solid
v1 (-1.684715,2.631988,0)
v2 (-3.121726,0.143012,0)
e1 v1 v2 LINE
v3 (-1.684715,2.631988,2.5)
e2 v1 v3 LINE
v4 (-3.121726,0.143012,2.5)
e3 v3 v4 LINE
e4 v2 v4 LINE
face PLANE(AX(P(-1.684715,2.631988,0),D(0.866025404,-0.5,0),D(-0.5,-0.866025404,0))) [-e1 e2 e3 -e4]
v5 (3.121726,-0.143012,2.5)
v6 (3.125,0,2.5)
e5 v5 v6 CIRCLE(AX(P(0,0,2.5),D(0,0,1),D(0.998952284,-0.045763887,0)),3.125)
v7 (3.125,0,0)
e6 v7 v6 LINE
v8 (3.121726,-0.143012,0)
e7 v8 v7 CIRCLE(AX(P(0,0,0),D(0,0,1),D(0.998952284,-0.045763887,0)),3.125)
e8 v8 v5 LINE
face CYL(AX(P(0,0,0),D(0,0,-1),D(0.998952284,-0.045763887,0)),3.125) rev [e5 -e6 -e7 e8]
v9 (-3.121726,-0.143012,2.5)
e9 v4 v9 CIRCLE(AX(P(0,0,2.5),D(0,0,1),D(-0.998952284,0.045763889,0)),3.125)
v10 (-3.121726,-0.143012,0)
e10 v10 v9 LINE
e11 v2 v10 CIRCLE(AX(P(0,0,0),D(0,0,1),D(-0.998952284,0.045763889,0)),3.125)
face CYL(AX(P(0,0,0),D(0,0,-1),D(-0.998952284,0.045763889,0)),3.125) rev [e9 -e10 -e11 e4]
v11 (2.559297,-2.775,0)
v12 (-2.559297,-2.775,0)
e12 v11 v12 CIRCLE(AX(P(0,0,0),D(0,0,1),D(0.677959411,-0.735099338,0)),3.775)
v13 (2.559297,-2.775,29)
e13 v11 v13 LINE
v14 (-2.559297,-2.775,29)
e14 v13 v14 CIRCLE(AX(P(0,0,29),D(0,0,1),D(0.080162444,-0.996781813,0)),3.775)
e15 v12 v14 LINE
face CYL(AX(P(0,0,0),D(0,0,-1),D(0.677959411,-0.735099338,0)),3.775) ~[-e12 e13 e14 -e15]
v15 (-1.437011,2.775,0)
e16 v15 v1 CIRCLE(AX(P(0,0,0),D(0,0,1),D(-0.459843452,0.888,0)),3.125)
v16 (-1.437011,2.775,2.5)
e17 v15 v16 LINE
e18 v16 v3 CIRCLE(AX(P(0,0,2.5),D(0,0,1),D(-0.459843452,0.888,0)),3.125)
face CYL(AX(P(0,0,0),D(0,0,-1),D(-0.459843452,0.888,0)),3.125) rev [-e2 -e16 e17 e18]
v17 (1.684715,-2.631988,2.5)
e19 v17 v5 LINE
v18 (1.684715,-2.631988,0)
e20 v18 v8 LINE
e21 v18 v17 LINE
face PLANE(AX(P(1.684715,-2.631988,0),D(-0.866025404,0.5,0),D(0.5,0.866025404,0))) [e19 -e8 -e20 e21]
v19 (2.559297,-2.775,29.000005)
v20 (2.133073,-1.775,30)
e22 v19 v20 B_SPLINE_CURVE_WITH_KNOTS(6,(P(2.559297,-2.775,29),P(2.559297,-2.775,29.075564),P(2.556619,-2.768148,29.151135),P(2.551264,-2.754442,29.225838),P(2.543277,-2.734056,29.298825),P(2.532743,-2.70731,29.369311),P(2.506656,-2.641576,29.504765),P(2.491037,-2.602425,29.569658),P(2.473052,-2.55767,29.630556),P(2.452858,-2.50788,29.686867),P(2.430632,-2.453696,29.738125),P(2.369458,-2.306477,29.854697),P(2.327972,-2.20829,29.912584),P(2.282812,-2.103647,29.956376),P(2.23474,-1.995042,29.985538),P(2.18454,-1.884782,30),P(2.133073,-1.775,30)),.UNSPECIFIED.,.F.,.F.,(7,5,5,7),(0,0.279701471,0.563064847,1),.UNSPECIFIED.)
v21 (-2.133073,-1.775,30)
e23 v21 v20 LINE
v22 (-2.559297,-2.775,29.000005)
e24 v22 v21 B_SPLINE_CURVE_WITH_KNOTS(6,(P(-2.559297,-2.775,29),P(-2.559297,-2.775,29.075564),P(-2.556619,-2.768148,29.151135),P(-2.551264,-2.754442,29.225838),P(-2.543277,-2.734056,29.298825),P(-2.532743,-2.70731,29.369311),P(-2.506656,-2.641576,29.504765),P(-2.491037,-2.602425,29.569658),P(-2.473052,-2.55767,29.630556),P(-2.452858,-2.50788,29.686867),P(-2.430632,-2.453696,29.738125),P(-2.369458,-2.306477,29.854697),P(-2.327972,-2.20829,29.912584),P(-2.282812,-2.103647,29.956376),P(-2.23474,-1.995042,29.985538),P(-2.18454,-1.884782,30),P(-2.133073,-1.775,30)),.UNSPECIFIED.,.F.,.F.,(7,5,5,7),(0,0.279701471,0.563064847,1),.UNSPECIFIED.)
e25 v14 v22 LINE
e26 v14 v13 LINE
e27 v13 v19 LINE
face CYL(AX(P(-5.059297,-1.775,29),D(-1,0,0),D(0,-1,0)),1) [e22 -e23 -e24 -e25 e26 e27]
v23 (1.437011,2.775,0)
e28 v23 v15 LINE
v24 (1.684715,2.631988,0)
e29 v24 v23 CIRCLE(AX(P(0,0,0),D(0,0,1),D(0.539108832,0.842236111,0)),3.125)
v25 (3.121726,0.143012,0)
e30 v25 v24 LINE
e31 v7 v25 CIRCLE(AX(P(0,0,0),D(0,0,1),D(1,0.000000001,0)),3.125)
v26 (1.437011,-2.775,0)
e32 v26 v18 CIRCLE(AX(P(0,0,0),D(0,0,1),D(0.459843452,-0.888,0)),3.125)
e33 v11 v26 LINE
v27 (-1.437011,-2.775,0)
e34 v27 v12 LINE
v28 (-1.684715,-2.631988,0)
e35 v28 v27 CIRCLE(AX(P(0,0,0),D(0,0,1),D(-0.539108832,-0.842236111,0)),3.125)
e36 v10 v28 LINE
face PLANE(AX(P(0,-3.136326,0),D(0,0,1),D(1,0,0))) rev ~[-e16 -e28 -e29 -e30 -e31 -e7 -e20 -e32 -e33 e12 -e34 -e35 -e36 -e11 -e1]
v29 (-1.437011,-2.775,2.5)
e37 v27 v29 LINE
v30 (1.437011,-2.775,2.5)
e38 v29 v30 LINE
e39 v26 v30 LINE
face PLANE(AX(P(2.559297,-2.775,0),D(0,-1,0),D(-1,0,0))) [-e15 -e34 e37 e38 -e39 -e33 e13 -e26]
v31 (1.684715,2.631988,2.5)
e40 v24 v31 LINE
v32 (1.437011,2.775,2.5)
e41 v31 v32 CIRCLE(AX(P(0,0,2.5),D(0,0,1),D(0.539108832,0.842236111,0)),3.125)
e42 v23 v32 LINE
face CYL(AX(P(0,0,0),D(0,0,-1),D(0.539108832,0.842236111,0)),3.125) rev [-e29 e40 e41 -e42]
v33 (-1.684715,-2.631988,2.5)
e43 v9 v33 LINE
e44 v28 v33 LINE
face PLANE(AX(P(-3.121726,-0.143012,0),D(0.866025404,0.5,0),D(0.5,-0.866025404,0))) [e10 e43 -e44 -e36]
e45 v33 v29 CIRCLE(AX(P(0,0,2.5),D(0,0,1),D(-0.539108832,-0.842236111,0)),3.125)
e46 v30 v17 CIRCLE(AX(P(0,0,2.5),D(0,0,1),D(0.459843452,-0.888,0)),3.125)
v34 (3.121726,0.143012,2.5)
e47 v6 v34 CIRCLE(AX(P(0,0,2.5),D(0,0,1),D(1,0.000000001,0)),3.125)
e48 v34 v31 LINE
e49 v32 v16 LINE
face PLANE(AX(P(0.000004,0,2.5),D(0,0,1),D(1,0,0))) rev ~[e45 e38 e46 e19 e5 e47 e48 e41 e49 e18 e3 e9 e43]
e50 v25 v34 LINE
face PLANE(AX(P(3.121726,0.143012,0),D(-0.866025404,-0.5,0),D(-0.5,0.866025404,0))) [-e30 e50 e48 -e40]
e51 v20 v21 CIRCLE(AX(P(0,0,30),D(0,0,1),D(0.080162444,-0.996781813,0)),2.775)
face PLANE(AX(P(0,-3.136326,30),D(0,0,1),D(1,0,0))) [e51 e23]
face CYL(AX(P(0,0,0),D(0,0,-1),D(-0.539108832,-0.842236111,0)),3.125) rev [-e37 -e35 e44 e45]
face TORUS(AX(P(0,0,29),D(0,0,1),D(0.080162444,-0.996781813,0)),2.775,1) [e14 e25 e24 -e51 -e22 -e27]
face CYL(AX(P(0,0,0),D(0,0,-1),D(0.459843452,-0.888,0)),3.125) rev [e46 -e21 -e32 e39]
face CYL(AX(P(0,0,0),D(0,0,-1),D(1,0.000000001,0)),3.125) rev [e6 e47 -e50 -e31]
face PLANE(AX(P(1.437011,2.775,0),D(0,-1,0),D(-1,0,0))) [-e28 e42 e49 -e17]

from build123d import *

# Parameters (mm, degrees)
F1_DEPTH    = 30
F2_DEPTH    = 2.5
F3_DEPTH    = 30
F4_T1_DEPTH = 10.1185935568
F4_T4_ANGLE = 350.8041938213


# Not quite as in the source:
# - a fillet or chamfer that OpenCascade refuses, or shapes differently, is made with other operations: its cross-section is extruded or revolved along the edge and cut away or added


with BuildPart() as f1:
    # F0 (on Top) → F1 (new body)
    with BuildSketch(Plane.XY):
        with BuildLine():
            Line((-1.4370107863, -2.775), (-1.602146997, -2.775))
            Line((-1.602146997, -2.775), (-2.5592967784, -2.775))
            ThreePointArc((-2.5592967784, -2.775), (0, -3.775), (2.5592967784, -2.775))
            Line((2.5592967784, -2.775), (1.602146997, -2.775))
            Line((1.602146997, -2.775), (1.4370107863, -2.775))
            ThreePointArc((1.4370107863, -2.775), (0, -3.125), (-1.4370107863, -2.775))
        make_face()
        with BuildLine():
            Line((-1.6847151023, 2.6319878465), (-1.602146997, 2.775))
            Line((-1.602146997, 2.775), (-1.4370107863, 2.775))
            ThreePointArc((-1.4370107863, 2.775), (0, 3.125), (1.4370107863, 2.775))
            Line((1.4370107863, 2.775), (1.602146997, 2.775))
            Line((1.602146997, 2.775), (1.6847151023, 2.6319878465))
            ThreePointArc((1.6847151023, 2.6319878465), (2.7063293868, 1.5625), (3.1217258887, 0.1430121535))
            Line((3.1217258887, 0.1430121535), (3.204293994, 0))
            Line((3.204293994, 0), (3.1217258887, -0.1430121535))
            ThreePointArc((3.1217258887, -0.1430121535), (2.7063293868, -1.5625), (1.6847151023, -2.6319878465))
            Line((1.6847151023, -2.6319878465), (1.602146997, -2.775))
            Line((1.602146997, -2.775), (2.5592967784, -2.775))
            ThreePointArc((2.5592967784, -2.775), (3.4577427853, -1.5148068625), (3.775, 0))
            ThreePointArc((3.775, 0), (-1.5148068625, 3.4577427853), (-2.5592967784, -2.775))
            Line((-2.5592967784, -2.775), (-1.602146997, -2.775))
            Line((-1.602146997, -2.775), (-1.6847151023, -2.6319878465))
            ThreePointArc((-1.6847151023, -2.6319878465), (-2.7063293868, -1.5625), (-3.1217258887, -0.1430121535))
            Line((-3.1217258887, -0.1430121535), (-3.204293994, 0))
            Line((-3.204293994, 0), (-3.1217258887, 0.1430121535))
            ThreePointArc((-3.1217258887, 0.1430121535), (-2.7063293868, 1.5625), (-1.6847151023, 2.6319878465))
        make_face()
        with BuildLine():
            ThreePointArc((3.1217258887, 0.1430121535), (2.7063293868, 1.5625), (1.6847151023, 2.6319878465))
            Line((1.6847151023, 2.6319878465), (3.1217258887, 0.1430121535))
        make_face()
        with BuildLine():
            Line((1.4370107863, -2.775), (-1.4370107863, -2.775))
            ThreePointArc((-1.4370107863, -2.775), (0, -3.125), (1.4370107863, -2.775))
        make_face()
        with BuildLine():
            ThreePointArc((1.4370107863, 2.775), (0, 3.125), (-1.4370107863, 2.775))
            Line((-1.4370107863, 2.775), (1.4370107863, 2.775))
        make_face()
        with BuildLine():
            Line((-3.1217258887, 0.1430121535), (-1.6847151023, 2.6319878465))
            ThreePointArc((-1.6847151023, 2.6319878465), (-2.7063293868, 1.5625), (-3.1217258887, 0.1430121535))
        make_face()
        with BuildLine():
            Line((1.4370107863, 2.775), (-1.4370107863, 2.775))
            ThreePointArc((-1.4370107863, 2.775), (-1.5625, 2.7063293868), (-1.6847151023, 2.6319878465))
            Line((-1.6847151023, 2.6319878465), (-3.1217258887, 0.1430121535))
            ThreePointArc((-3.1217258887, 0.1430121535), (-3.125, 0), (-3.1217258887, -0.1430121535))
            Line((-3.1217258887, -0.1430121535), (-1.6847151023, -2.6319878465))
            ThreePointArc((-1.6847151023, -2.6319878465), (-1.5625, -2.7063293868), (-1.4370107863, -2.775))
            Line((-1.4370107863, -2.775), (1.4370107863, -2.775))
            ThreePointArc((1.4370107863, -2.775), (1.5625, -2.7063293868), (1.6847151023, -2.6319878465))
            Line((1.6847151023, -2.6319878465), (3.1217258887, -0.1430121535))
            ThreePointArc((3.1217258887, -0.1430121535), (3.1241813649, -0.0715248136), (3.125, 0))
            ThreePointArc((3.125, 0), (3.1241813649, 0.0715248136), (3.1217258887, 0.1430121535))
            Line((3.1217258887, 0.1430121535), (1.6847151023, 2.6319878465))
            ThreePointArc((1.6847151023, 2.6319878465), (1.5625, 2.7063293868), (1.4370107863, 2.775))
        make_face()
        with BuildLine():
            Line((-1.6847151023, -2.6319878465), (-3.1217258887, -0.1430121535))
            ThreePointArc((-3.1217258887, -0.1430121535), (-2.7063293868, -1.5625), (-1.6847151023, -2.6319878465))
        make_face()
        with BuildLine():
            ThreePointArc((1.6847151023, -2.6319878465), (2.7063293868, -1.5625), (3.1217258887, -0.1430121535))
            Line((3.1217258887, -0.1430121535), (1.6847151023, -2.6319878465))
        make_face()
        with BuildLine():
            ThreePointArc((-1.4370107863, -2.775), (-1.5625, -2.7063293868), (-1.6847151023, -2.6319878465))
            Line((-1.6847151023, -2.6319878465), (-1.602146997, -2.775))
            Line((-1.602146997, -2.775), (-1.4370107863, -2.775))
        make_face()
        with BuildLine():
            ThreePointArc((1.6847151023, -2.6319878465), (1.5625, -2.7063293868), (1.4370107863, -2.775))
            Line((1.4370107863, -2.775), (1.602146997, -2.775))
            Line((1.602146997, -2.775), (1.6847151023, -2.6319878465))
        make_face()
        with BuildLine():
            Line((3.204293994, 0), (3.1217258887, 0.1430121535))
            ThreePointArc((3.1217258887, 0.1430121535), (3.1241813649, 0.0715248136), (3.125, 0))
            ThreePointArc((3.125, 0), (3.1241813649, -0.0715248136), (3.1217258887, -0.1430121535))
            Line((3.1217258887, -0.1430121535), (3.204293994, 0))
        make_face()
        with BuildLine():
            ThreePointArc((-3.1217258887, -0.1430121535), (-3.125, 0), (-3.1217258887, 0.1430121535))
            Line((-3.1217258887, 0.1430121535), (-3.204293994, 0))
            Line((-3.204293994, 0), (-3.1217258887, -0.1430121535))
        make_face()
        with BuildLine():
            Line((1.602146997, 2.775), (1.4370107863, 2.775))
            ThreePointArc((1.4370107863, 2.775), (1.5625, 2.7063293868), (1.6847151023, 2.6319878465))
            Line((1.6847151023, 2.6319878465), (1.602146997, 2.775))
        make_face()
        with BuildLine():
            Line((-1.4370107863, 2.775), (-1.602146997, 2.775))
            Line((-1.602146997, 2.775), (-1.6847151023, 2.6319878465))
            ThreePointArc((-1.6847151023, 2.6319878465), (-1.5625, 2.7063293868), (-1.4370107863, 2.775))
        make_face()
    extrude(amount=F1_DEPTH)

    # F0 (on Top) → F2 (cut)
    with BuildSketch(Plane.XY):
        with BuildLine():
            Line((1.4370107863, 2.775), (-1.4370107863, 2.775))
            ThreePointArc((-1.4370107863, 2.775), (-1.5625, 2.7063293868), (-1.6847151023, 2.6319878465))
            Line((-1.6847151023, 2.6319878465), (-3.1217258887, 0.1430121535))
            ThreePointArc((-3.1217258887, 0.1430121535), (-3.125, 0), (-3.1217258887, -0.1430121535))
            Line((-3.1217258887, -0.1430121535), (-1.6847151023, -2.6319878465))
            ThreePointArc((-1.6847151023, -2.6319878465), (-1.5625, -2.7063293868), (-1.4370107863, -2.775))
            Line((-1.4370107863, -2.775), (1.4370107863, -2.775))
            ThreePointArc((1.4370107863, -2.775), (1.5625, -2.7063293868), (1.6847151023, -2.6319878465))
            Line((1.6847151023, -2.6319878465), (3.1217258887, -0.1430121535))
            ThreePointArc((3.1217258887, -0.1430121535), (3.1241813649, -0.0715248136), (3.125, 0))
            ThreePointArc((3.125, 0), (3.1241813649, 0.0715248136), (3.1217258887, 0.1430121535))
            Line((3.1217258887, 0.1430121535), (1.6847151023, 2.6319878465))
            ThreePointArc((1.6847151023, 2.6319878465), (1.5625, 2.7063293868), (1.4370107863, 2.775))
        make_face()
    extrude(amount=F2_DEPTH, mode=Mode.SUBTRACT)

    # F0 (on Top) → F3 (cut, through all)
    with BuildSketch(Plane.XY):
        with BuildLine():
            Line((1.4370107863, -2.775), (-1.4370107863, -2.775))
            ThreePointArc((-1.4370107863, -2.775), (0, -3.125), (1.4370107863, -2.775))
        make_face()
        with BuildLine():
            Line((-1.4370107863, -2.775), (-1.602146997, -2.775))
            Line((-1.602146997, -2.775), (-2.5592967784, -2.775))
            ThreePointArc((-2.5592967784, -2.775), (0, -3.775), (2.5592967784, -2.775))
            Line((2.5592967784, -2.775), (1.602146997, -2.775))
            Line((1.602146997, -2.775), (1.4370107863, -2.775))
            ThreePointArc((1.4370107863, -2.775), (0, -3.125), (-1.4370107863, -2.775))
        make_face()
    extrude(amount=F3_DEPTH, mode=Mode.SUBTRACT)

    # F4: fillet of radius 1 on 2 edges, made by hand

    # F4_s2 → F4_t1 (cut)
    with BuildSketch(Plane.YZ.offset(-5.0592967784)):
        with BuildLine():
            ThreePointArc((-2.775, 29), (-2.4821067812, 29.7071067812), (-1.775, 30))
            Line((-1.775, 30), (-2.775, 30))
            Line((-2.775, 30), (-2.775, 29))
        make_face()
    extrude(amount=F4_T1_DEPTH, mode=Mode.SUBTRACT)

    # F4_s3 → F4_t4 (revolve, cut)
    with BuildSketch(Plane(origin=(0, 0, 0), x_dir=(0, 0, 1), z_dir=(-0.9967818129, -0.0801624442, 0))):
        with BuildLine():
            ThreePointArc((29, -3.775), (29.7071067812, -3.4821067812), (30, -2.775))
            Line((30, -2.775), (30, -3.775))
            Line((30, -3.775), (29, -3.775))
        make_face()
    revolve(axis=Axis((0, 0, 30), (0, 0, 1)), revolution_arc=F4_T4_ANGLE, mode=Mode.SUBTRACT)


solid = f1.part
